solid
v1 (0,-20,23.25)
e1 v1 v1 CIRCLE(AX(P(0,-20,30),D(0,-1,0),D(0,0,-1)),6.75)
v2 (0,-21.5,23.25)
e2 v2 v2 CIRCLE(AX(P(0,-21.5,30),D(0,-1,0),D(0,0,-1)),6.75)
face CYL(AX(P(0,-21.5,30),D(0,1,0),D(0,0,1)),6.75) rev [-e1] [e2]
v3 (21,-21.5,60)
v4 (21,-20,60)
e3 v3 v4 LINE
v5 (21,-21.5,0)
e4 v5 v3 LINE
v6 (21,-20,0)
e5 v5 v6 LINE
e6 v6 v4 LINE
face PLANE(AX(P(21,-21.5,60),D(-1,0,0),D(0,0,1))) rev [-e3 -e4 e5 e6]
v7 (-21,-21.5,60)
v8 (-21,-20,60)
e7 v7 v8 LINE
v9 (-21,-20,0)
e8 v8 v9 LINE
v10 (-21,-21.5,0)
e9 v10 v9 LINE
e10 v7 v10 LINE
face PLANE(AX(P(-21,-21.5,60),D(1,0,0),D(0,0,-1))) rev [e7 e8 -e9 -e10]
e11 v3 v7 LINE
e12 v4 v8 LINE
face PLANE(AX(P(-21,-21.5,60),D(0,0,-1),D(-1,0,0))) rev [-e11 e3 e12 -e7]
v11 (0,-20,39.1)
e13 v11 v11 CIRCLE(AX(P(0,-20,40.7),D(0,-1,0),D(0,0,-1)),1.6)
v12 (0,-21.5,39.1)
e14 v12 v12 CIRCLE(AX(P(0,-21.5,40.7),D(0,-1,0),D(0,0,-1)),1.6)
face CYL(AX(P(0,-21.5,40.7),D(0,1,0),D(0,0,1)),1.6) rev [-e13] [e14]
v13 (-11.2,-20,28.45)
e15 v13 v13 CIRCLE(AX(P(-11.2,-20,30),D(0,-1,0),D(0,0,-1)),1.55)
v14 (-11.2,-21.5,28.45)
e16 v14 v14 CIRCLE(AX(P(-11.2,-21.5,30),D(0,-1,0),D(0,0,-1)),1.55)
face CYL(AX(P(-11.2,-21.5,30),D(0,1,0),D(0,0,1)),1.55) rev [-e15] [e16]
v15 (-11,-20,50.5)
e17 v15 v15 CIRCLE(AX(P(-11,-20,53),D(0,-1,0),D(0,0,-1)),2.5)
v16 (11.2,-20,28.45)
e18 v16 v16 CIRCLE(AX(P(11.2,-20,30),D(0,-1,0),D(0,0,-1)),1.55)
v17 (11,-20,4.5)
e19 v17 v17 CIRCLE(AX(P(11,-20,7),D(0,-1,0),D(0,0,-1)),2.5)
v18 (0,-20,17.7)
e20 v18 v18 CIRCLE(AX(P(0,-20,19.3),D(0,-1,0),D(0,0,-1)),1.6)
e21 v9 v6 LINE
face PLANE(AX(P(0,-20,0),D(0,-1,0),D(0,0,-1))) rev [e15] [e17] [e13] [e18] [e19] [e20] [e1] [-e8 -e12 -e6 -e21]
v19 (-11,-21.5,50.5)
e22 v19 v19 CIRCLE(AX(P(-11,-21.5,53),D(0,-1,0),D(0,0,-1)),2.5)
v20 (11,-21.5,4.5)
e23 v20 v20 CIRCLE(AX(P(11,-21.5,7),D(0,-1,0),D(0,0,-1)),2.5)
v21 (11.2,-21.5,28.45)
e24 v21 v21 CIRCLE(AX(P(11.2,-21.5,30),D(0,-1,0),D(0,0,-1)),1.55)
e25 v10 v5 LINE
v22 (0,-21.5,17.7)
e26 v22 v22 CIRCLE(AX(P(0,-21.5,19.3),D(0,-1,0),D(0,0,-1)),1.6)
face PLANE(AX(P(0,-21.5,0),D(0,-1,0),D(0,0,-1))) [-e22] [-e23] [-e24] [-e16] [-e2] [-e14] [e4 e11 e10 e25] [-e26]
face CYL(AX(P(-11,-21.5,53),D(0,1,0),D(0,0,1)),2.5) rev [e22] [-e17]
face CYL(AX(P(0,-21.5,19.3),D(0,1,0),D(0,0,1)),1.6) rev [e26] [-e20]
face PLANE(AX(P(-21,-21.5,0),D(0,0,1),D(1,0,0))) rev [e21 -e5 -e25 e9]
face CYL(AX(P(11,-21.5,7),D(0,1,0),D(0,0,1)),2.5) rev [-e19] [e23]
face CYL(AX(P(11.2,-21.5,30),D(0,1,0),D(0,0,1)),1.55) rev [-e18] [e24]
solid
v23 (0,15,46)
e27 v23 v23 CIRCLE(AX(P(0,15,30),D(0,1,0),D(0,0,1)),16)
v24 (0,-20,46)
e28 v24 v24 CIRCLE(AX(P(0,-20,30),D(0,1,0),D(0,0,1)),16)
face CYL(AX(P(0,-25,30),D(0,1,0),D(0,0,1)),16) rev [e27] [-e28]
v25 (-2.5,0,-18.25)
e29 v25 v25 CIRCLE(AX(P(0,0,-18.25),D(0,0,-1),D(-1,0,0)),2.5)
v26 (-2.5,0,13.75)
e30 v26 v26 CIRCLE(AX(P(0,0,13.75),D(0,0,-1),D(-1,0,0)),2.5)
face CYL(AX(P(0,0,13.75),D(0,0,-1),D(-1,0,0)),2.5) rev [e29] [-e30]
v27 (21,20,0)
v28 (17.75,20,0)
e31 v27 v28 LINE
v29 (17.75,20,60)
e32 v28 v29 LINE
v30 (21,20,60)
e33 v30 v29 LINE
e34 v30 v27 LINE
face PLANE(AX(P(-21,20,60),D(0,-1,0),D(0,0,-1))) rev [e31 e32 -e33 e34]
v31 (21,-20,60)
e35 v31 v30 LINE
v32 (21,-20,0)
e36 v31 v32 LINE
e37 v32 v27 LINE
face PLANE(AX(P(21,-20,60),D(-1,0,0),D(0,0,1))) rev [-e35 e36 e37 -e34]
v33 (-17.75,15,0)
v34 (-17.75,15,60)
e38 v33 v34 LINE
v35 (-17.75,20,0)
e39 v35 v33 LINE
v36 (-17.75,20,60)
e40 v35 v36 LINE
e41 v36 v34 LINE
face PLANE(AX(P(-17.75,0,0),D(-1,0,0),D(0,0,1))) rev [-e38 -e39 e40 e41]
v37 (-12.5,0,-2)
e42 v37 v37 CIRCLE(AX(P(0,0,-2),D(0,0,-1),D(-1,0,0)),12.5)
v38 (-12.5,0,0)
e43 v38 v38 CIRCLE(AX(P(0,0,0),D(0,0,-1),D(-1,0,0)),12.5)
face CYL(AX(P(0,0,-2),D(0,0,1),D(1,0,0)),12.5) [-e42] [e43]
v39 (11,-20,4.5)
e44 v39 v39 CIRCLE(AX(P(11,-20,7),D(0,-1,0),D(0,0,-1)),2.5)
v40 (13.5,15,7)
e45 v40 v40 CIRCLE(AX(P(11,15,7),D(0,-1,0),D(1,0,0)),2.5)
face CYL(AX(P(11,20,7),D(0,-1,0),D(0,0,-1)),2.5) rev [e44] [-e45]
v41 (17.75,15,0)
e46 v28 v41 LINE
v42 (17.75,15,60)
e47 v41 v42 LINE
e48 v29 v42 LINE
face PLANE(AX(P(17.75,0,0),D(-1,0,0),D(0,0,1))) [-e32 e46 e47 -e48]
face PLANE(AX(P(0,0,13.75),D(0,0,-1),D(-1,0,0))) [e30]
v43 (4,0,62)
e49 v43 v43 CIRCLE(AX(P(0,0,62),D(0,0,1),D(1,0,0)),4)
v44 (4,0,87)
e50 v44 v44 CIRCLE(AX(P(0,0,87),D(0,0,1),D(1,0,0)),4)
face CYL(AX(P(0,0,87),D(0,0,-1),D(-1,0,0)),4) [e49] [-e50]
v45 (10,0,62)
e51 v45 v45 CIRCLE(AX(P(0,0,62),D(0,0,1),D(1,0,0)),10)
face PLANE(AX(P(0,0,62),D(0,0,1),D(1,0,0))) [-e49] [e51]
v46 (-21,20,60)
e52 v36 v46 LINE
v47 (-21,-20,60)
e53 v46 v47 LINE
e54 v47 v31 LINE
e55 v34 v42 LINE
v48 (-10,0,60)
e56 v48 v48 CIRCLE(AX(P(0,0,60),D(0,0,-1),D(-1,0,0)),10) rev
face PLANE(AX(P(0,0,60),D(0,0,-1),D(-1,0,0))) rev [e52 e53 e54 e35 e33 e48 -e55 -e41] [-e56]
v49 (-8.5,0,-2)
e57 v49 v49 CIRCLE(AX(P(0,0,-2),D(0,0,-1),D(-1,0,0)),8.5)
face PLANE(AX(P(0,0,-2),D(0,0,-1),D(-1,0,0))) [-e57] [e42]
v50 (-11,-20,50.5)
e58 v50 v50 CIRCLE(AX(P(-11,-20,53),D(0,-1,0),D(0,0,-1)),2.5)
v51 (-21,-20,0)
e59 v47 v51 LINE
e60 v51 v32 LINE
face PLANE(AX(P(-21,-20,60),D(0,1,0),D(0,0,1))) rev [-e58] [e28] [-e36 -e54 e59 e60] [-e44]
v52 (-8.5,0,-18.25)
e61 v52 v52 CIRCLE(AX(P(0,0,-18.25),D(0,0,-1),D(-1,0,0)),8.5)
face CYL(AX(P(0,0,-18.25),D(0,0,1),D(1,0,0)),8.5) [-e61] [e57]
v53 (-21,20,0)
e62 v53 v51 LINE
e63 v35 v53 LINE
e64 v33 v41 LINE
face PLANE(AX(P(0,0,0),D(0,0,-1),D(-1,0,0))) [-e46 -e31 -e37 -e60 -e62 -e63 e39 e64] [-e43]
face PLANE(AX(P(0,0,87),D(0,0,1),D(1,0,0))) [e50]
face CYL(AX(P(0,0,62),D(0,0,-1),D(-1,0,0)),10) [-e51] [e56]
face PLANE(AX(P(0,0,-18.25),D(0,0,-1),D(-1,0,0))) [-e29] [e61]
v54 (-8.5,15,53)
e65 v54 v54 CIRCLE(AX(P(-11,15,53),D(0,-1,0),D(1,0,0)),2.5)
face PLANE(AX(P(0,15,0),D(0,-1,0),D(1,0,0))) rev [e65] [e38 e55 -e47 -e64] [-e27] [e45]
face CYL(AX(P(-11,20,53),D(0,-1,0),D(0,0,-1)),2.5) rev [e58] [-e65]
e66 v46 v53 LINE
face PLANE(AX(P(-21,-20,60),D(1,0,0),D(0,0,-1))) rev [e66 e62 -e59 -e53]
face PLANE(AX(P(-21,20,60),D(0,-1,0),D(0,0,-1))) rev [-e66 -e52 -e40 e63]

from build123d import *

# Parameters (mm, degrees)
SKETCH1_W           = 42
SKETCH1_H           = 40
BOSS_EXTRUDE1_DEPTH = 60
SKETCH2_W           = 35.5
SKETCH2_H           = 5
CUT_EXTRUDE1_DEPTH  = 60
SKETCH3_R           = 16
CUT_EXTRUDE2_DEPTH  = 40
SKETCH4_R           = 8.5
BOSS_EXTRUDE2_DEPTH = 18.25
SKETCH6_R           = 12.5
BOSS_EXTRUDE3_DEPTH = 2
SKETCH7_R           = 10
BOSS_EXTRUDE4_DEPTH = 2
SKETCH8_R           = 4
BOSS_EXTRUDE5_DEPTH = 25
SKETCH9_R           = 2.5
CUT_EXTRUDE6_DEPTH  = 32
SKETCH10_W          = 42
SKETCH10_H          = 60
SKETCH10_R          = 2.5
SKETCH10_R_2        = 6.75
SKETCH10_R_3        = 1.6
SKETCH10_R_4        = 1.55
BASE_FLANGE1_DEPTH  = 1.5
SKETCH15_R          = 2.5
CUT_EXTRUDE7_DEPTH  = 99.030607465


# Sheet-metal steps are written as plain solids
with BuildPart() as part:
    # Sketch1 → Boss-Extrude1 (new body)
    with BuildSketch(Plane.XY):
        Rectangle(SKETCH1_W, SKETCH1_H)
    extrude(amount=BOSS_EXTRUDE1_DEPTH)

    # Sketch2 → Cut-Extrude1 (cut)
    with BuildSketch(Plane.XY.offset(60)):
        with Locations((0, 17.5)):
            Rectangle(SKETCH2_W, SKETCH2_H)
    extrude(amount=-CUT_EXTRUDE1_DEPTH, mode=Mode.SUBTRACT)

    # Sketch3 → Cut-Extrude2 (cut)
    with BuildSketch(Plane(origin=(0, 15, 0), x_dir=(1, 0, 0), z_dir=(0, 1, 0))):
        with Locations(Location((0, -30, 0), (0, 0, 270))):
            Circle(SKETCH3_R)
    extrude(amount=-CUT_EXTRUDE2_DEPTH, mode=Mode.SUBTRACT)

    # Sketch4 → Boss-Extrude2 (add)
    with BuildSketch(Plane(origin=(0, 0, 0), x_dir=(-1, 0, 0), z_dir=(0, 0, -1))):
        Circle(SKETCH4_R)
    extrude(amount=BOSS_EXTRUDE2_DEPTH)

    # Sketch6 → Boss-Extrude3 (add)
    with BuildSketch(Plane(origin=(0, 0, 0), x_dir=(-1, 0, 0), z_dir=(0, 0, -1))):
        Circle(SKETCH6_R)
    extrude(amount=BOSS_EXTRUDE3_DEPTH)

    # Sketch7 → Boss-Extrude4 (add)
    with BuildSketch(Plane.XY.offset(60)):
        with Locations(Location((0, 0, 0), (0, 0, 180))):
            Circle(SKETCH7_R)
    extrude(amount=BOSS_EXTRUDE4_DEPTH)

    # Sketch8 → Boss-Extrude5 (add)
    with BuildSketch(Plane.XY.offset(62)):
        Circle(SKETCH8_R)
    extrude(amount=BOSS_EXTRUDE5_DEPTH)

    # Sketch9 → Cut-Extrude6 (cut)
    with BuildSketch(Plane(origin=(0, 0, -18.25), x_dir=(-1, 0, 0), z_dir=(0, 0, -1))):
        Circle(SKETCH9_R)
    extrude(amount=-CUT_EXTRUDE6_DEPTH, mode=Mode.SUBTRACT)

    # Sketch15 → Cut-Extrude7 (cut, through all)
    with BuildSketch(Plane.XZ.offset(20)):
        with Locations(Location((-11, 53, 0), (0, 0, 270))):
            Circle(SKETCH15_R)
        with Locations(Location((11, 7, 0), (0, 0, 270))):
            Circle(SKETCH15_R)
    extrude(amount=-CUT_EXTRUDE7_DEPTH, mode=Mode.SUBTRACT)


with BuildPart() as body_2:
    # Sketch10 → Base-Flange1 (new body)
    with BuildSketch(Plane.XZ.offset(20)):
        with Locations((0, 30)):
            Rectangle(SKETCH10_W, SKETCH10_H)
        with Locations(Location((-11, 53, 0), (0, 0, 270))):
            Circle(SKETCH10_R, mode=Mode.SUBTRACT)
        with Locations(Location((11, 7, 0), (0, 0, 270))):
            Circle(SKETCH10_R, mode=Mode.SUBTRACT)
        with Locations(Location((0, 30, 0), (0, 0, 270))):
            Circle(SKETCH10_R_2, mode=Mode.SUBTRACT)
        with Locations(Location((0, 40.7, 0), (0, 0, 270))):
            Circle(SKETCH10_R_3, mode=Mode.SUBTRACT)
        with Locations(Location((0, 19.3, 0), (0, 0, 270))):
            Circle(SKETCH10_R_3, mode=Mode.SUBTRACT)
        with Locations(Location((-11.2, 30, 0), (0, 0, 270))):
            Circle(SKETCH10_R_4, mode=Mode.SUBTRACT)
        with Locations(Location((11.2, 30, 0), (0, 0, 270))):
            Circle(SKETCH10_R_4, mode=Mode.SUBTRACT)
    extrude(amount=BASE_FLANGE1_DEPTH)


solid = Compound([part.part, body_2.part])
